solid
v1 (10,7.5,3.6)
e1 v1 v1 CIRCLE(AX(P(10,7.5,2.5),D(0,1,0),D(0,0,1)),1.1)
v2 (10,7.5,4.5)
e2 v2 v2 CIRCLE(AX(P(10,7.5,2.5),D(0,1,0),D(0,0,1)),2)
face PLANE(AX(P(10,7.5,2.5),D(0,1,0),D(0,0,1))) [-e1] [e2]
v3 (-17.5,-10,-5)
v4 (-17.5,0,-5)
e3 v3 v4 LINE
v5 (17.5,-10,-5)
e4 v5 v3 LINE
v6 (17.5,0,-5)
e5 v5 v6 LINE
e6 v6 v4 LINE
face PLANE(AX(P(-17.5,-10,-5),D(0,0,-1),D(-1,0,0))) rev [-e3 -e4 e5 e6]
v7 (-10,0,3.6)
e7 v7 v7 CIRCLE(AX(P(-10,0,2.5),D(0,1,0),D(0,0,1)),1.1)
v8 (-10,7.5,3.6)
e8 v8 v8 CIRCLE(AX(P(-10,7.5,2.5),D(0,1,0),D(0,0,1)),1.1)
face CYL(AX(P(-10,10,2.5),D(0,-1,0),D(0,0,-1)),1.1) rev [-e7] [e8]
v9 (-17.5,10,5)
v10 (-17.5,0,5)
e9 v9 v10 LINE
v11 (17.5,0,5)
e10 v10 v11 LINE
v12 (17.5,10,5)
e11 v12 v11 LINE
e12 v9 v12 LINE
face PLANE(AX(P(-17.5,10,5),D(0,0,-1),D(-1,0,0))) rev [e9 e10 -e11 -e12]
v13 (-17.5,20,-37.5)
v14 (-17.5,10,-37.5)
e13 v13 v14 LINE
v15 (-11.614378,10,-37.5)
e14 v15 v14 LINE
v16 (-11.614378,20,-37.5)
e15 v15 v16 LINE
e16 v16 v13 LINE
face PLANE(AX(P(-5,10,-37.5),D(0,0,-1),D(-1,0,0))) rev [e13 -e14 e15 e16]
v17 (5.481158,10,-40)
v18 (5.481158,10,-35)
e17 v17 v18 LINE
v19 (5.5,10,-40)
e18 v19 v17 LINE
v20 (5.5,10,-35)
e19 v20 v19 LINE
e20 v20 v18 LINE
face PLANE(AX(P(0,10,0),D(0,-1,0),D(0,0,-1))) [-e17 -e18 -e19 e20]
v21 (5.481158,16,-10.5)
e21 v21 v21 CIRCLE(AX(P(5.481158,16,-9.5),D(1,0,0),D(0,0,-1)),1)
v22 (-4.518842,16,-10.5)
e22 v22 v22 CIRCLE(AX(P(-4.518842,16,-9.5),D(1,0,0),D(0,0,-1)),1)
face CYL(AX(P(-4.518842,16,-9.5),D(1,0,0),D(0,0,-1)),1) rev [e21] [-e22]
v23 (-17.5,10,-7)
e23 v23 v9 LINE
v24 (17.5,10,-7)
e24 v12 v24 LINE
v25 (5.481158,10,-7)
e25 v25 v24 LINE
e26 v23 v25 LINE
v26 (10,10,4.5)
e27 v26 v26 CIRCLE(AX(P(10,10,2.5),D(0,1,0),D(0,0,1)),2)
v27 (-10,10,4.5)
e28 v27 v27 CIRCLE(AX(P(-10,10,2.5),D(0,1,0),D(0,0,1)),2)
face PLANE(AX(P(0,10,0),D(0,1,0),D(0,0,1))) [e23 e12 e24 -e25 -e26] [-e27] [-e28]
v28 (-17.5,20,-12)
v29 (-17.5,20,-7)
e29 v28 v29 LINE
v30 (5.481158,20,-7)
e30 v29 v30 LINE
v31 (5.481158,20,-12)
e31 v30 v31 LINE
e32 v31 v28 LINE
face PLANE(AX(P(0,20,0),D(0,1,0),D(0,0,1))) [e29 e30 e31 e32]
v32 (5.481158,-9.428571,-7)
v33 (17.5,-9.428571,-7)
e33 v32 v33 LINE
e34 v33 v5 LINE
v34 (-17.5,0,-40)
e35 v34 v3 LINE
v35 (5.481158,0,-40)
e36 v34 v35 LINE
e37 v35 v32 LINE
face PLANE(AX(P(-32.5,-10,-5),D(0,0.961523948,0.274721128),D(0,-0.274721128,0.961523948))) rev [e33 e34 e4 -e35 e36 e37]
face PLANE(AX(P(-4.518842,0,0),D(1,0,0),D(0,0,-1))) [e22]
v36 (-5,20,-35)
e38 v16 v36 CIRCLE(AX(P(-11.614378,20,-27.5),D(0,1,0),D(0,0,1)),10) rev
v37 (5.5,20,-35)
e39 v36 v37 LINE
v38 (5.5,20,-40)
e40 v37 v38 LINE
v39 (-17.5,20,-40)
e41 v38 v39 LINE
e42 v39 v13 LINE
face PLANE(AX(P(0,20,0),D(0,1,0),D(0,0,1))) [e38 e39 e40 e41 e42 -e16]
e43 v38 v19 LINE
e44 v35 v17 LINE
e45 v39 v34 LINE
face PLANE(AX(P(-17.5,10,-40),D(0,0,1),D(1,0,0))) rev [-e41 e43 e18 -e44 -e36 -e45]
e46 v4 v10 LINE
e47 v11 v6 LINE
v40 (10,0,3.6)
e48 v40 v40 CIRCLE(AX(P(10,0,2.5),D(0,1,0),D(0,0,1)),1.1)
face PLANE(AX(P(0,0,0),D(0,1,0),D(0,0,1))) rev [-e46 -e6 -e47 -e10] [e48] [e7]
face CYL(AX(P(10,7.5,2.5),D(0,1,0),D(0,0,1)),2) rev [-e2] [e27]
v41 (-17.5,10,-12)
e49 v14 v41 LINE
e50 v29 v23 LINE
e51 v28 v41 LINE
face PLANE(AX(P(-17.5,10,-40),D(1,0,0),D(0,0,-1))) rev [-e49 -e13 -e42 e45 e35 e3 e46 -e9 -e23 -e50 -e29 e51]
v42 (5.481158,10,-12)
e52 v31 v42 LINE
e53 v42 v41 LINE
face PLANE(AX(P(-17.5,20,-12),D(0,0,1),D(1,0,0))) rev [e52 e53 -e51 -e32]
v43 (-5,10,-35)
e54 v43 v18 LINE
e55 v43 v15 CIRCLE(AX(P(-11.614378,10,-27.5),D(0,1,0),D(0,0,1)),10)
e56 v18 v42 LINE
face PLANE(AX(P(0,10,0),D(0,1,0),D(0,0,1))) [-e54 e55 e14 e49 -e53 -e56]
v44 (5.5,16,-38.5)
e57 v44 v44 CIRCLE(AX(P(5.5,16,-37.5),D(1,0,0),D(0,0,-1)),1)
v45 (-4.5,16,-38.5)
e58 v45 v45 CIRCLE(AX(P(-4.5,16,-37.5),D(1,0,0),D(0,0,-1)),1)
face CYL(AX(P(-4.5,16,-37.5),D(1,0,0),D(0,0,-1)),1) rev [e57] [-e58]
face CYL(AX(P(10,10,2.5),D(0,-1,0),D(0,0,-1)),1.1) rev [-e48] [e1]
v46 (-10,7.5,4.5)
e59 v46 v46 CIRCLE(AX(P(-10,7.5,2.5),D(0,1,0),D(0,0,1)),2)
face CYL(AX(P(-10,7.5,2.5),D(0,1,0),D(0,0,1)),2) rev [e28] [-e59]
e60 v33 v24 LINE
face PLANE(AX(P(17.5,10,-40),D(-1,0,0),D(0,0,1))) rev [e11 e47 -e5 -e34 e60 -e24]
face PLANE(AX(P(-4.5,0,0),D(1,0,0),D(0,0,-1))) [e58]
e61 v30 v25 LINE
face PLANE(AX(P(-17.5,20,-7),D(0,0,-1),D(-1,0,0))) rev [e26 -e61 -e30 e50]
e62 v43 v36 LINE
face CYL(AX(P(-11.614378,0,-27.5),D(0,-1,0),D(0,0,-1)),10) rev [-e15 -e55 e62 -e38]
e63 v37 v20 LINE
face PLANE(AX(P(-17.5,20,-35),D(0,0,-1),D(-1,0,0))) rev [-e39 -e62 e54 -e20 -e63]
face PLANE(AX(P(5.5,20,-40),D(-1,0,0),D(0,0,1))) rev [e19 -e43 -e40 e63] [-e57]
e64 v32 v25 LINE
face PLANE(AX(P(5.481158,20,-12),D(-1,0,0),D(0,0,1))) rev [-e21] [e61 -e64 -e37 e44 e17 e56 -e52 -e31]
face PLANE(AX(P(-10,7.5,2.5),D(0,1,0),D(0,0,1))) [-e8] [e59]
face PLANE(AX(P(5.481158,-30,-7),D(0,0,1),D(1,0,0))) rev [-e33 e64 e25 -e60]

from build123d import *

# Parameters (mm, degrees)
SKETCH1_W           = 35
SKETCH1_H           = 45
SKETCH1_R           = 1.1
BOSS_EXTRUDE1_DEPTH = 10
SKETCH5_W           = 35
SKETCH5_H           = 35
BOSS_EXTRUDE3_DEPTH = 10
CUT_EXTRUDE1_DEPTH  = 50
SKETCH7_W           = 23
SKETCH7_H           = 5
BOSS_EXTRUDE4_DEPTH = 10
SKETCH8_W           = 22.981157626
SKETCH8_H           = 5
BOSS_EXTRUDE5_DEPTH = 10
SKETCH9_W           = 12.018842374
SKETCH9_H           = 33
CUT_EXTRUDE2_DEPTH  = 40
SKETCH10_R          = 1
CUT_EXTRUDE3_DEPTH  = 10
SKETCH11_R          = 1
CUT_EXTRUDE4_DEPTH  = 10
SKETCH13_W          = 2.5
SKETCH13_H          = 10
CUT_EXTRUDE6_DEPTH  = 12.5
FILLET1_R           = 10
SKETCH14_R          = 2
CUT_EXTRUDE7_DEPTH  = 2.5


with BuildPart() as part:
    # Sketch1 → Boss-Extrude1 (new body)
    with BuildSketch(Plane(origin=(0, 0, 0), x_dir=(1, 0, 0), z_dir=(0, 1, 0))):
        with Locations((0, 17.5)):
            Rectangle(SKETCH1_W, SKETCH1_H)
        with Locations(Location((-10, -2.5, 0), (0, 0, 270))):
            Circle(SKETCH1_R, mode=Mode.SUBTRACT)
        with Locations(Location((10, -2.5, 0), (0, 0, 270))):
            Circle(SKETCH1_R, mode=Mode.SUBTRACT)
    extrude(amount=BOSS_EXTRUDE1_DEPTH)

    # Sketch5 → Boss-Extrude3 (add)
    with BuildSketch(Plane.XZ):
        with Locations((0, -22.5)):
            Rectangle(SKETCH5_W, SKETCH5_H)
    extrude(amount=BOSS_EXTRUDE3_DEPTH)

    # Sketch6 → Cut-Extrude1 (cut)
    with BuildSketch(Plane(origin=(17.5, 0, 0), x_dir=(0, 0, -1), z_dir=(1, 0, 0))):
        Polygon((5, -10), (40, 0), (40, -10), align=None)
    extrude(amount=-CUT_EXTRUDE1_DEPTH, mode=Mode.SUBTRACT)

    # Sketch7 → Boss-Extrude4 (add)
    with BuildSketch(Plane(origin=(0, 10, 0), x_dir=(1, 0, 0), z_dir=(0, 1, 0))):
        with Locations((-6, 37.5)):
            Rectangle(SKETCH7_W, SKETCH7_H)
    extrude(amount=BOSS_EXTRUDE4_DEPTH)

    # Sketch8 → Boss-Extrude5 (add)
    with BuildSketch(Plane(origin=(0, 10, 0), x_dir=(1, 0, 0), z_dir=(0, 1, 0))):
        with Locations((-6.009421187, 9.5)):
            Rectangle(SKETCH8_W, SKETCH8_H)
    extrude(amount=BOSS_EXTRUDE5_DEPTH)

    # Sketch9 → Cut-Extrude2 (cut)
    with BuildSketch(Plane(origin=(0, 10, 0), x_dir=(1, 0, 0), z_dir=(0, 1, 0))):
        with Locations((11.490578813, 23.5)):
            Rectangle(SKETCH9_W, SKETCH9_H)
    extrude(amount=-CUT_EXTRUDE2_DEPTH, mode=Mode.SUBTRACT)

    # Sketch10 → Cut-Extrude3 (cut)
    with BuildSketch(Plane(origin=(5.481157626, 0, 0), x_dir=(0, 0, -1), z_dir=(1, 0, 0))):
        with Locations((9.5, 16)):
            Circle(SKETCH10_R)
    extrude(amount=-CUT_EXTRUDE3_DEPTH, mode=Mode.SUBTRACT)

    # Sketch11 → Cut-Extrude4 (cut)
    with BuildSketch(Plane(origin=(5.5, 0, 0), x_dir=(0, 0, -1), z_dir=(1, 0, 0))):
        with Locations((37.5, 16)):
            Circle(SKETCH11_R)
    extrude(amount=-CUT_EXTRUDE4_DEPTH, mode=Mode.SUBTRACT)

    # Sketch13 → Cut-Extrude6 (cut)
    with BuildSketch(Plane.ZY.offset(17.5)):
        with Locations((-36.25, 15)):
            Rectangle(SKETCH13_W, SKETCH13_H)
    extrude(amount=-CUT_EXTRUDE6_DEPTH, mode=Mode.SUBTRACT)

    # Fillet1
    # the kernel refuses this fillet: 10 mm, written as the material it adds along each edge
    with BuildSketch(Plane(origin=(-5, -6.535945694, -37.5), x_dir=(-1, 0, 0), z_dir=(0, 1, 0))) as fillet1_piece_1_section:
        with BuildLine():
            CenterArc((6.614378278, 10), FILLET1_R, 228.590377891, 41.409622109)
            Line((0, 2.5), (0, 0))
            Line((0, 0), (6.614378278, 0))
        make_face()
    fillet1_piece_1 = extrude(amount=26.535945694, mode=Mode.PRIVATE)
    fillet1_piece_1 = split(fillet1_piece_1, bisect_by=Plane(origin=(-8.071773304, 0.306036312, -41.071127093), z_dir=(0, 0.9615239476408232, 0.27472112789737807)), keep=Keep.TOP, mode=Mode.PRIVATE)
    add(fillet1_piece_1)

    # Sketch14 → Cut-Extrude7 (cut)
    with BuildSketch(Plane(origin=(0, 10, 0), x_dir=(1, 0, 0), z_dir=(0, 1, 0))):
        with Locations(Location((10, -2.5, 0), (0, 0, 270))):
            Circle(SKETCH14_R)
        with Locations(Location((-10, -2.5, 0), (0, 0, 270))):
            Circle(SKETCH14_R)
    extrude(amount=-CUT_EXTRUDE7_DEPTH, mode=Mode.SUBTRACT)


solid = part.part
